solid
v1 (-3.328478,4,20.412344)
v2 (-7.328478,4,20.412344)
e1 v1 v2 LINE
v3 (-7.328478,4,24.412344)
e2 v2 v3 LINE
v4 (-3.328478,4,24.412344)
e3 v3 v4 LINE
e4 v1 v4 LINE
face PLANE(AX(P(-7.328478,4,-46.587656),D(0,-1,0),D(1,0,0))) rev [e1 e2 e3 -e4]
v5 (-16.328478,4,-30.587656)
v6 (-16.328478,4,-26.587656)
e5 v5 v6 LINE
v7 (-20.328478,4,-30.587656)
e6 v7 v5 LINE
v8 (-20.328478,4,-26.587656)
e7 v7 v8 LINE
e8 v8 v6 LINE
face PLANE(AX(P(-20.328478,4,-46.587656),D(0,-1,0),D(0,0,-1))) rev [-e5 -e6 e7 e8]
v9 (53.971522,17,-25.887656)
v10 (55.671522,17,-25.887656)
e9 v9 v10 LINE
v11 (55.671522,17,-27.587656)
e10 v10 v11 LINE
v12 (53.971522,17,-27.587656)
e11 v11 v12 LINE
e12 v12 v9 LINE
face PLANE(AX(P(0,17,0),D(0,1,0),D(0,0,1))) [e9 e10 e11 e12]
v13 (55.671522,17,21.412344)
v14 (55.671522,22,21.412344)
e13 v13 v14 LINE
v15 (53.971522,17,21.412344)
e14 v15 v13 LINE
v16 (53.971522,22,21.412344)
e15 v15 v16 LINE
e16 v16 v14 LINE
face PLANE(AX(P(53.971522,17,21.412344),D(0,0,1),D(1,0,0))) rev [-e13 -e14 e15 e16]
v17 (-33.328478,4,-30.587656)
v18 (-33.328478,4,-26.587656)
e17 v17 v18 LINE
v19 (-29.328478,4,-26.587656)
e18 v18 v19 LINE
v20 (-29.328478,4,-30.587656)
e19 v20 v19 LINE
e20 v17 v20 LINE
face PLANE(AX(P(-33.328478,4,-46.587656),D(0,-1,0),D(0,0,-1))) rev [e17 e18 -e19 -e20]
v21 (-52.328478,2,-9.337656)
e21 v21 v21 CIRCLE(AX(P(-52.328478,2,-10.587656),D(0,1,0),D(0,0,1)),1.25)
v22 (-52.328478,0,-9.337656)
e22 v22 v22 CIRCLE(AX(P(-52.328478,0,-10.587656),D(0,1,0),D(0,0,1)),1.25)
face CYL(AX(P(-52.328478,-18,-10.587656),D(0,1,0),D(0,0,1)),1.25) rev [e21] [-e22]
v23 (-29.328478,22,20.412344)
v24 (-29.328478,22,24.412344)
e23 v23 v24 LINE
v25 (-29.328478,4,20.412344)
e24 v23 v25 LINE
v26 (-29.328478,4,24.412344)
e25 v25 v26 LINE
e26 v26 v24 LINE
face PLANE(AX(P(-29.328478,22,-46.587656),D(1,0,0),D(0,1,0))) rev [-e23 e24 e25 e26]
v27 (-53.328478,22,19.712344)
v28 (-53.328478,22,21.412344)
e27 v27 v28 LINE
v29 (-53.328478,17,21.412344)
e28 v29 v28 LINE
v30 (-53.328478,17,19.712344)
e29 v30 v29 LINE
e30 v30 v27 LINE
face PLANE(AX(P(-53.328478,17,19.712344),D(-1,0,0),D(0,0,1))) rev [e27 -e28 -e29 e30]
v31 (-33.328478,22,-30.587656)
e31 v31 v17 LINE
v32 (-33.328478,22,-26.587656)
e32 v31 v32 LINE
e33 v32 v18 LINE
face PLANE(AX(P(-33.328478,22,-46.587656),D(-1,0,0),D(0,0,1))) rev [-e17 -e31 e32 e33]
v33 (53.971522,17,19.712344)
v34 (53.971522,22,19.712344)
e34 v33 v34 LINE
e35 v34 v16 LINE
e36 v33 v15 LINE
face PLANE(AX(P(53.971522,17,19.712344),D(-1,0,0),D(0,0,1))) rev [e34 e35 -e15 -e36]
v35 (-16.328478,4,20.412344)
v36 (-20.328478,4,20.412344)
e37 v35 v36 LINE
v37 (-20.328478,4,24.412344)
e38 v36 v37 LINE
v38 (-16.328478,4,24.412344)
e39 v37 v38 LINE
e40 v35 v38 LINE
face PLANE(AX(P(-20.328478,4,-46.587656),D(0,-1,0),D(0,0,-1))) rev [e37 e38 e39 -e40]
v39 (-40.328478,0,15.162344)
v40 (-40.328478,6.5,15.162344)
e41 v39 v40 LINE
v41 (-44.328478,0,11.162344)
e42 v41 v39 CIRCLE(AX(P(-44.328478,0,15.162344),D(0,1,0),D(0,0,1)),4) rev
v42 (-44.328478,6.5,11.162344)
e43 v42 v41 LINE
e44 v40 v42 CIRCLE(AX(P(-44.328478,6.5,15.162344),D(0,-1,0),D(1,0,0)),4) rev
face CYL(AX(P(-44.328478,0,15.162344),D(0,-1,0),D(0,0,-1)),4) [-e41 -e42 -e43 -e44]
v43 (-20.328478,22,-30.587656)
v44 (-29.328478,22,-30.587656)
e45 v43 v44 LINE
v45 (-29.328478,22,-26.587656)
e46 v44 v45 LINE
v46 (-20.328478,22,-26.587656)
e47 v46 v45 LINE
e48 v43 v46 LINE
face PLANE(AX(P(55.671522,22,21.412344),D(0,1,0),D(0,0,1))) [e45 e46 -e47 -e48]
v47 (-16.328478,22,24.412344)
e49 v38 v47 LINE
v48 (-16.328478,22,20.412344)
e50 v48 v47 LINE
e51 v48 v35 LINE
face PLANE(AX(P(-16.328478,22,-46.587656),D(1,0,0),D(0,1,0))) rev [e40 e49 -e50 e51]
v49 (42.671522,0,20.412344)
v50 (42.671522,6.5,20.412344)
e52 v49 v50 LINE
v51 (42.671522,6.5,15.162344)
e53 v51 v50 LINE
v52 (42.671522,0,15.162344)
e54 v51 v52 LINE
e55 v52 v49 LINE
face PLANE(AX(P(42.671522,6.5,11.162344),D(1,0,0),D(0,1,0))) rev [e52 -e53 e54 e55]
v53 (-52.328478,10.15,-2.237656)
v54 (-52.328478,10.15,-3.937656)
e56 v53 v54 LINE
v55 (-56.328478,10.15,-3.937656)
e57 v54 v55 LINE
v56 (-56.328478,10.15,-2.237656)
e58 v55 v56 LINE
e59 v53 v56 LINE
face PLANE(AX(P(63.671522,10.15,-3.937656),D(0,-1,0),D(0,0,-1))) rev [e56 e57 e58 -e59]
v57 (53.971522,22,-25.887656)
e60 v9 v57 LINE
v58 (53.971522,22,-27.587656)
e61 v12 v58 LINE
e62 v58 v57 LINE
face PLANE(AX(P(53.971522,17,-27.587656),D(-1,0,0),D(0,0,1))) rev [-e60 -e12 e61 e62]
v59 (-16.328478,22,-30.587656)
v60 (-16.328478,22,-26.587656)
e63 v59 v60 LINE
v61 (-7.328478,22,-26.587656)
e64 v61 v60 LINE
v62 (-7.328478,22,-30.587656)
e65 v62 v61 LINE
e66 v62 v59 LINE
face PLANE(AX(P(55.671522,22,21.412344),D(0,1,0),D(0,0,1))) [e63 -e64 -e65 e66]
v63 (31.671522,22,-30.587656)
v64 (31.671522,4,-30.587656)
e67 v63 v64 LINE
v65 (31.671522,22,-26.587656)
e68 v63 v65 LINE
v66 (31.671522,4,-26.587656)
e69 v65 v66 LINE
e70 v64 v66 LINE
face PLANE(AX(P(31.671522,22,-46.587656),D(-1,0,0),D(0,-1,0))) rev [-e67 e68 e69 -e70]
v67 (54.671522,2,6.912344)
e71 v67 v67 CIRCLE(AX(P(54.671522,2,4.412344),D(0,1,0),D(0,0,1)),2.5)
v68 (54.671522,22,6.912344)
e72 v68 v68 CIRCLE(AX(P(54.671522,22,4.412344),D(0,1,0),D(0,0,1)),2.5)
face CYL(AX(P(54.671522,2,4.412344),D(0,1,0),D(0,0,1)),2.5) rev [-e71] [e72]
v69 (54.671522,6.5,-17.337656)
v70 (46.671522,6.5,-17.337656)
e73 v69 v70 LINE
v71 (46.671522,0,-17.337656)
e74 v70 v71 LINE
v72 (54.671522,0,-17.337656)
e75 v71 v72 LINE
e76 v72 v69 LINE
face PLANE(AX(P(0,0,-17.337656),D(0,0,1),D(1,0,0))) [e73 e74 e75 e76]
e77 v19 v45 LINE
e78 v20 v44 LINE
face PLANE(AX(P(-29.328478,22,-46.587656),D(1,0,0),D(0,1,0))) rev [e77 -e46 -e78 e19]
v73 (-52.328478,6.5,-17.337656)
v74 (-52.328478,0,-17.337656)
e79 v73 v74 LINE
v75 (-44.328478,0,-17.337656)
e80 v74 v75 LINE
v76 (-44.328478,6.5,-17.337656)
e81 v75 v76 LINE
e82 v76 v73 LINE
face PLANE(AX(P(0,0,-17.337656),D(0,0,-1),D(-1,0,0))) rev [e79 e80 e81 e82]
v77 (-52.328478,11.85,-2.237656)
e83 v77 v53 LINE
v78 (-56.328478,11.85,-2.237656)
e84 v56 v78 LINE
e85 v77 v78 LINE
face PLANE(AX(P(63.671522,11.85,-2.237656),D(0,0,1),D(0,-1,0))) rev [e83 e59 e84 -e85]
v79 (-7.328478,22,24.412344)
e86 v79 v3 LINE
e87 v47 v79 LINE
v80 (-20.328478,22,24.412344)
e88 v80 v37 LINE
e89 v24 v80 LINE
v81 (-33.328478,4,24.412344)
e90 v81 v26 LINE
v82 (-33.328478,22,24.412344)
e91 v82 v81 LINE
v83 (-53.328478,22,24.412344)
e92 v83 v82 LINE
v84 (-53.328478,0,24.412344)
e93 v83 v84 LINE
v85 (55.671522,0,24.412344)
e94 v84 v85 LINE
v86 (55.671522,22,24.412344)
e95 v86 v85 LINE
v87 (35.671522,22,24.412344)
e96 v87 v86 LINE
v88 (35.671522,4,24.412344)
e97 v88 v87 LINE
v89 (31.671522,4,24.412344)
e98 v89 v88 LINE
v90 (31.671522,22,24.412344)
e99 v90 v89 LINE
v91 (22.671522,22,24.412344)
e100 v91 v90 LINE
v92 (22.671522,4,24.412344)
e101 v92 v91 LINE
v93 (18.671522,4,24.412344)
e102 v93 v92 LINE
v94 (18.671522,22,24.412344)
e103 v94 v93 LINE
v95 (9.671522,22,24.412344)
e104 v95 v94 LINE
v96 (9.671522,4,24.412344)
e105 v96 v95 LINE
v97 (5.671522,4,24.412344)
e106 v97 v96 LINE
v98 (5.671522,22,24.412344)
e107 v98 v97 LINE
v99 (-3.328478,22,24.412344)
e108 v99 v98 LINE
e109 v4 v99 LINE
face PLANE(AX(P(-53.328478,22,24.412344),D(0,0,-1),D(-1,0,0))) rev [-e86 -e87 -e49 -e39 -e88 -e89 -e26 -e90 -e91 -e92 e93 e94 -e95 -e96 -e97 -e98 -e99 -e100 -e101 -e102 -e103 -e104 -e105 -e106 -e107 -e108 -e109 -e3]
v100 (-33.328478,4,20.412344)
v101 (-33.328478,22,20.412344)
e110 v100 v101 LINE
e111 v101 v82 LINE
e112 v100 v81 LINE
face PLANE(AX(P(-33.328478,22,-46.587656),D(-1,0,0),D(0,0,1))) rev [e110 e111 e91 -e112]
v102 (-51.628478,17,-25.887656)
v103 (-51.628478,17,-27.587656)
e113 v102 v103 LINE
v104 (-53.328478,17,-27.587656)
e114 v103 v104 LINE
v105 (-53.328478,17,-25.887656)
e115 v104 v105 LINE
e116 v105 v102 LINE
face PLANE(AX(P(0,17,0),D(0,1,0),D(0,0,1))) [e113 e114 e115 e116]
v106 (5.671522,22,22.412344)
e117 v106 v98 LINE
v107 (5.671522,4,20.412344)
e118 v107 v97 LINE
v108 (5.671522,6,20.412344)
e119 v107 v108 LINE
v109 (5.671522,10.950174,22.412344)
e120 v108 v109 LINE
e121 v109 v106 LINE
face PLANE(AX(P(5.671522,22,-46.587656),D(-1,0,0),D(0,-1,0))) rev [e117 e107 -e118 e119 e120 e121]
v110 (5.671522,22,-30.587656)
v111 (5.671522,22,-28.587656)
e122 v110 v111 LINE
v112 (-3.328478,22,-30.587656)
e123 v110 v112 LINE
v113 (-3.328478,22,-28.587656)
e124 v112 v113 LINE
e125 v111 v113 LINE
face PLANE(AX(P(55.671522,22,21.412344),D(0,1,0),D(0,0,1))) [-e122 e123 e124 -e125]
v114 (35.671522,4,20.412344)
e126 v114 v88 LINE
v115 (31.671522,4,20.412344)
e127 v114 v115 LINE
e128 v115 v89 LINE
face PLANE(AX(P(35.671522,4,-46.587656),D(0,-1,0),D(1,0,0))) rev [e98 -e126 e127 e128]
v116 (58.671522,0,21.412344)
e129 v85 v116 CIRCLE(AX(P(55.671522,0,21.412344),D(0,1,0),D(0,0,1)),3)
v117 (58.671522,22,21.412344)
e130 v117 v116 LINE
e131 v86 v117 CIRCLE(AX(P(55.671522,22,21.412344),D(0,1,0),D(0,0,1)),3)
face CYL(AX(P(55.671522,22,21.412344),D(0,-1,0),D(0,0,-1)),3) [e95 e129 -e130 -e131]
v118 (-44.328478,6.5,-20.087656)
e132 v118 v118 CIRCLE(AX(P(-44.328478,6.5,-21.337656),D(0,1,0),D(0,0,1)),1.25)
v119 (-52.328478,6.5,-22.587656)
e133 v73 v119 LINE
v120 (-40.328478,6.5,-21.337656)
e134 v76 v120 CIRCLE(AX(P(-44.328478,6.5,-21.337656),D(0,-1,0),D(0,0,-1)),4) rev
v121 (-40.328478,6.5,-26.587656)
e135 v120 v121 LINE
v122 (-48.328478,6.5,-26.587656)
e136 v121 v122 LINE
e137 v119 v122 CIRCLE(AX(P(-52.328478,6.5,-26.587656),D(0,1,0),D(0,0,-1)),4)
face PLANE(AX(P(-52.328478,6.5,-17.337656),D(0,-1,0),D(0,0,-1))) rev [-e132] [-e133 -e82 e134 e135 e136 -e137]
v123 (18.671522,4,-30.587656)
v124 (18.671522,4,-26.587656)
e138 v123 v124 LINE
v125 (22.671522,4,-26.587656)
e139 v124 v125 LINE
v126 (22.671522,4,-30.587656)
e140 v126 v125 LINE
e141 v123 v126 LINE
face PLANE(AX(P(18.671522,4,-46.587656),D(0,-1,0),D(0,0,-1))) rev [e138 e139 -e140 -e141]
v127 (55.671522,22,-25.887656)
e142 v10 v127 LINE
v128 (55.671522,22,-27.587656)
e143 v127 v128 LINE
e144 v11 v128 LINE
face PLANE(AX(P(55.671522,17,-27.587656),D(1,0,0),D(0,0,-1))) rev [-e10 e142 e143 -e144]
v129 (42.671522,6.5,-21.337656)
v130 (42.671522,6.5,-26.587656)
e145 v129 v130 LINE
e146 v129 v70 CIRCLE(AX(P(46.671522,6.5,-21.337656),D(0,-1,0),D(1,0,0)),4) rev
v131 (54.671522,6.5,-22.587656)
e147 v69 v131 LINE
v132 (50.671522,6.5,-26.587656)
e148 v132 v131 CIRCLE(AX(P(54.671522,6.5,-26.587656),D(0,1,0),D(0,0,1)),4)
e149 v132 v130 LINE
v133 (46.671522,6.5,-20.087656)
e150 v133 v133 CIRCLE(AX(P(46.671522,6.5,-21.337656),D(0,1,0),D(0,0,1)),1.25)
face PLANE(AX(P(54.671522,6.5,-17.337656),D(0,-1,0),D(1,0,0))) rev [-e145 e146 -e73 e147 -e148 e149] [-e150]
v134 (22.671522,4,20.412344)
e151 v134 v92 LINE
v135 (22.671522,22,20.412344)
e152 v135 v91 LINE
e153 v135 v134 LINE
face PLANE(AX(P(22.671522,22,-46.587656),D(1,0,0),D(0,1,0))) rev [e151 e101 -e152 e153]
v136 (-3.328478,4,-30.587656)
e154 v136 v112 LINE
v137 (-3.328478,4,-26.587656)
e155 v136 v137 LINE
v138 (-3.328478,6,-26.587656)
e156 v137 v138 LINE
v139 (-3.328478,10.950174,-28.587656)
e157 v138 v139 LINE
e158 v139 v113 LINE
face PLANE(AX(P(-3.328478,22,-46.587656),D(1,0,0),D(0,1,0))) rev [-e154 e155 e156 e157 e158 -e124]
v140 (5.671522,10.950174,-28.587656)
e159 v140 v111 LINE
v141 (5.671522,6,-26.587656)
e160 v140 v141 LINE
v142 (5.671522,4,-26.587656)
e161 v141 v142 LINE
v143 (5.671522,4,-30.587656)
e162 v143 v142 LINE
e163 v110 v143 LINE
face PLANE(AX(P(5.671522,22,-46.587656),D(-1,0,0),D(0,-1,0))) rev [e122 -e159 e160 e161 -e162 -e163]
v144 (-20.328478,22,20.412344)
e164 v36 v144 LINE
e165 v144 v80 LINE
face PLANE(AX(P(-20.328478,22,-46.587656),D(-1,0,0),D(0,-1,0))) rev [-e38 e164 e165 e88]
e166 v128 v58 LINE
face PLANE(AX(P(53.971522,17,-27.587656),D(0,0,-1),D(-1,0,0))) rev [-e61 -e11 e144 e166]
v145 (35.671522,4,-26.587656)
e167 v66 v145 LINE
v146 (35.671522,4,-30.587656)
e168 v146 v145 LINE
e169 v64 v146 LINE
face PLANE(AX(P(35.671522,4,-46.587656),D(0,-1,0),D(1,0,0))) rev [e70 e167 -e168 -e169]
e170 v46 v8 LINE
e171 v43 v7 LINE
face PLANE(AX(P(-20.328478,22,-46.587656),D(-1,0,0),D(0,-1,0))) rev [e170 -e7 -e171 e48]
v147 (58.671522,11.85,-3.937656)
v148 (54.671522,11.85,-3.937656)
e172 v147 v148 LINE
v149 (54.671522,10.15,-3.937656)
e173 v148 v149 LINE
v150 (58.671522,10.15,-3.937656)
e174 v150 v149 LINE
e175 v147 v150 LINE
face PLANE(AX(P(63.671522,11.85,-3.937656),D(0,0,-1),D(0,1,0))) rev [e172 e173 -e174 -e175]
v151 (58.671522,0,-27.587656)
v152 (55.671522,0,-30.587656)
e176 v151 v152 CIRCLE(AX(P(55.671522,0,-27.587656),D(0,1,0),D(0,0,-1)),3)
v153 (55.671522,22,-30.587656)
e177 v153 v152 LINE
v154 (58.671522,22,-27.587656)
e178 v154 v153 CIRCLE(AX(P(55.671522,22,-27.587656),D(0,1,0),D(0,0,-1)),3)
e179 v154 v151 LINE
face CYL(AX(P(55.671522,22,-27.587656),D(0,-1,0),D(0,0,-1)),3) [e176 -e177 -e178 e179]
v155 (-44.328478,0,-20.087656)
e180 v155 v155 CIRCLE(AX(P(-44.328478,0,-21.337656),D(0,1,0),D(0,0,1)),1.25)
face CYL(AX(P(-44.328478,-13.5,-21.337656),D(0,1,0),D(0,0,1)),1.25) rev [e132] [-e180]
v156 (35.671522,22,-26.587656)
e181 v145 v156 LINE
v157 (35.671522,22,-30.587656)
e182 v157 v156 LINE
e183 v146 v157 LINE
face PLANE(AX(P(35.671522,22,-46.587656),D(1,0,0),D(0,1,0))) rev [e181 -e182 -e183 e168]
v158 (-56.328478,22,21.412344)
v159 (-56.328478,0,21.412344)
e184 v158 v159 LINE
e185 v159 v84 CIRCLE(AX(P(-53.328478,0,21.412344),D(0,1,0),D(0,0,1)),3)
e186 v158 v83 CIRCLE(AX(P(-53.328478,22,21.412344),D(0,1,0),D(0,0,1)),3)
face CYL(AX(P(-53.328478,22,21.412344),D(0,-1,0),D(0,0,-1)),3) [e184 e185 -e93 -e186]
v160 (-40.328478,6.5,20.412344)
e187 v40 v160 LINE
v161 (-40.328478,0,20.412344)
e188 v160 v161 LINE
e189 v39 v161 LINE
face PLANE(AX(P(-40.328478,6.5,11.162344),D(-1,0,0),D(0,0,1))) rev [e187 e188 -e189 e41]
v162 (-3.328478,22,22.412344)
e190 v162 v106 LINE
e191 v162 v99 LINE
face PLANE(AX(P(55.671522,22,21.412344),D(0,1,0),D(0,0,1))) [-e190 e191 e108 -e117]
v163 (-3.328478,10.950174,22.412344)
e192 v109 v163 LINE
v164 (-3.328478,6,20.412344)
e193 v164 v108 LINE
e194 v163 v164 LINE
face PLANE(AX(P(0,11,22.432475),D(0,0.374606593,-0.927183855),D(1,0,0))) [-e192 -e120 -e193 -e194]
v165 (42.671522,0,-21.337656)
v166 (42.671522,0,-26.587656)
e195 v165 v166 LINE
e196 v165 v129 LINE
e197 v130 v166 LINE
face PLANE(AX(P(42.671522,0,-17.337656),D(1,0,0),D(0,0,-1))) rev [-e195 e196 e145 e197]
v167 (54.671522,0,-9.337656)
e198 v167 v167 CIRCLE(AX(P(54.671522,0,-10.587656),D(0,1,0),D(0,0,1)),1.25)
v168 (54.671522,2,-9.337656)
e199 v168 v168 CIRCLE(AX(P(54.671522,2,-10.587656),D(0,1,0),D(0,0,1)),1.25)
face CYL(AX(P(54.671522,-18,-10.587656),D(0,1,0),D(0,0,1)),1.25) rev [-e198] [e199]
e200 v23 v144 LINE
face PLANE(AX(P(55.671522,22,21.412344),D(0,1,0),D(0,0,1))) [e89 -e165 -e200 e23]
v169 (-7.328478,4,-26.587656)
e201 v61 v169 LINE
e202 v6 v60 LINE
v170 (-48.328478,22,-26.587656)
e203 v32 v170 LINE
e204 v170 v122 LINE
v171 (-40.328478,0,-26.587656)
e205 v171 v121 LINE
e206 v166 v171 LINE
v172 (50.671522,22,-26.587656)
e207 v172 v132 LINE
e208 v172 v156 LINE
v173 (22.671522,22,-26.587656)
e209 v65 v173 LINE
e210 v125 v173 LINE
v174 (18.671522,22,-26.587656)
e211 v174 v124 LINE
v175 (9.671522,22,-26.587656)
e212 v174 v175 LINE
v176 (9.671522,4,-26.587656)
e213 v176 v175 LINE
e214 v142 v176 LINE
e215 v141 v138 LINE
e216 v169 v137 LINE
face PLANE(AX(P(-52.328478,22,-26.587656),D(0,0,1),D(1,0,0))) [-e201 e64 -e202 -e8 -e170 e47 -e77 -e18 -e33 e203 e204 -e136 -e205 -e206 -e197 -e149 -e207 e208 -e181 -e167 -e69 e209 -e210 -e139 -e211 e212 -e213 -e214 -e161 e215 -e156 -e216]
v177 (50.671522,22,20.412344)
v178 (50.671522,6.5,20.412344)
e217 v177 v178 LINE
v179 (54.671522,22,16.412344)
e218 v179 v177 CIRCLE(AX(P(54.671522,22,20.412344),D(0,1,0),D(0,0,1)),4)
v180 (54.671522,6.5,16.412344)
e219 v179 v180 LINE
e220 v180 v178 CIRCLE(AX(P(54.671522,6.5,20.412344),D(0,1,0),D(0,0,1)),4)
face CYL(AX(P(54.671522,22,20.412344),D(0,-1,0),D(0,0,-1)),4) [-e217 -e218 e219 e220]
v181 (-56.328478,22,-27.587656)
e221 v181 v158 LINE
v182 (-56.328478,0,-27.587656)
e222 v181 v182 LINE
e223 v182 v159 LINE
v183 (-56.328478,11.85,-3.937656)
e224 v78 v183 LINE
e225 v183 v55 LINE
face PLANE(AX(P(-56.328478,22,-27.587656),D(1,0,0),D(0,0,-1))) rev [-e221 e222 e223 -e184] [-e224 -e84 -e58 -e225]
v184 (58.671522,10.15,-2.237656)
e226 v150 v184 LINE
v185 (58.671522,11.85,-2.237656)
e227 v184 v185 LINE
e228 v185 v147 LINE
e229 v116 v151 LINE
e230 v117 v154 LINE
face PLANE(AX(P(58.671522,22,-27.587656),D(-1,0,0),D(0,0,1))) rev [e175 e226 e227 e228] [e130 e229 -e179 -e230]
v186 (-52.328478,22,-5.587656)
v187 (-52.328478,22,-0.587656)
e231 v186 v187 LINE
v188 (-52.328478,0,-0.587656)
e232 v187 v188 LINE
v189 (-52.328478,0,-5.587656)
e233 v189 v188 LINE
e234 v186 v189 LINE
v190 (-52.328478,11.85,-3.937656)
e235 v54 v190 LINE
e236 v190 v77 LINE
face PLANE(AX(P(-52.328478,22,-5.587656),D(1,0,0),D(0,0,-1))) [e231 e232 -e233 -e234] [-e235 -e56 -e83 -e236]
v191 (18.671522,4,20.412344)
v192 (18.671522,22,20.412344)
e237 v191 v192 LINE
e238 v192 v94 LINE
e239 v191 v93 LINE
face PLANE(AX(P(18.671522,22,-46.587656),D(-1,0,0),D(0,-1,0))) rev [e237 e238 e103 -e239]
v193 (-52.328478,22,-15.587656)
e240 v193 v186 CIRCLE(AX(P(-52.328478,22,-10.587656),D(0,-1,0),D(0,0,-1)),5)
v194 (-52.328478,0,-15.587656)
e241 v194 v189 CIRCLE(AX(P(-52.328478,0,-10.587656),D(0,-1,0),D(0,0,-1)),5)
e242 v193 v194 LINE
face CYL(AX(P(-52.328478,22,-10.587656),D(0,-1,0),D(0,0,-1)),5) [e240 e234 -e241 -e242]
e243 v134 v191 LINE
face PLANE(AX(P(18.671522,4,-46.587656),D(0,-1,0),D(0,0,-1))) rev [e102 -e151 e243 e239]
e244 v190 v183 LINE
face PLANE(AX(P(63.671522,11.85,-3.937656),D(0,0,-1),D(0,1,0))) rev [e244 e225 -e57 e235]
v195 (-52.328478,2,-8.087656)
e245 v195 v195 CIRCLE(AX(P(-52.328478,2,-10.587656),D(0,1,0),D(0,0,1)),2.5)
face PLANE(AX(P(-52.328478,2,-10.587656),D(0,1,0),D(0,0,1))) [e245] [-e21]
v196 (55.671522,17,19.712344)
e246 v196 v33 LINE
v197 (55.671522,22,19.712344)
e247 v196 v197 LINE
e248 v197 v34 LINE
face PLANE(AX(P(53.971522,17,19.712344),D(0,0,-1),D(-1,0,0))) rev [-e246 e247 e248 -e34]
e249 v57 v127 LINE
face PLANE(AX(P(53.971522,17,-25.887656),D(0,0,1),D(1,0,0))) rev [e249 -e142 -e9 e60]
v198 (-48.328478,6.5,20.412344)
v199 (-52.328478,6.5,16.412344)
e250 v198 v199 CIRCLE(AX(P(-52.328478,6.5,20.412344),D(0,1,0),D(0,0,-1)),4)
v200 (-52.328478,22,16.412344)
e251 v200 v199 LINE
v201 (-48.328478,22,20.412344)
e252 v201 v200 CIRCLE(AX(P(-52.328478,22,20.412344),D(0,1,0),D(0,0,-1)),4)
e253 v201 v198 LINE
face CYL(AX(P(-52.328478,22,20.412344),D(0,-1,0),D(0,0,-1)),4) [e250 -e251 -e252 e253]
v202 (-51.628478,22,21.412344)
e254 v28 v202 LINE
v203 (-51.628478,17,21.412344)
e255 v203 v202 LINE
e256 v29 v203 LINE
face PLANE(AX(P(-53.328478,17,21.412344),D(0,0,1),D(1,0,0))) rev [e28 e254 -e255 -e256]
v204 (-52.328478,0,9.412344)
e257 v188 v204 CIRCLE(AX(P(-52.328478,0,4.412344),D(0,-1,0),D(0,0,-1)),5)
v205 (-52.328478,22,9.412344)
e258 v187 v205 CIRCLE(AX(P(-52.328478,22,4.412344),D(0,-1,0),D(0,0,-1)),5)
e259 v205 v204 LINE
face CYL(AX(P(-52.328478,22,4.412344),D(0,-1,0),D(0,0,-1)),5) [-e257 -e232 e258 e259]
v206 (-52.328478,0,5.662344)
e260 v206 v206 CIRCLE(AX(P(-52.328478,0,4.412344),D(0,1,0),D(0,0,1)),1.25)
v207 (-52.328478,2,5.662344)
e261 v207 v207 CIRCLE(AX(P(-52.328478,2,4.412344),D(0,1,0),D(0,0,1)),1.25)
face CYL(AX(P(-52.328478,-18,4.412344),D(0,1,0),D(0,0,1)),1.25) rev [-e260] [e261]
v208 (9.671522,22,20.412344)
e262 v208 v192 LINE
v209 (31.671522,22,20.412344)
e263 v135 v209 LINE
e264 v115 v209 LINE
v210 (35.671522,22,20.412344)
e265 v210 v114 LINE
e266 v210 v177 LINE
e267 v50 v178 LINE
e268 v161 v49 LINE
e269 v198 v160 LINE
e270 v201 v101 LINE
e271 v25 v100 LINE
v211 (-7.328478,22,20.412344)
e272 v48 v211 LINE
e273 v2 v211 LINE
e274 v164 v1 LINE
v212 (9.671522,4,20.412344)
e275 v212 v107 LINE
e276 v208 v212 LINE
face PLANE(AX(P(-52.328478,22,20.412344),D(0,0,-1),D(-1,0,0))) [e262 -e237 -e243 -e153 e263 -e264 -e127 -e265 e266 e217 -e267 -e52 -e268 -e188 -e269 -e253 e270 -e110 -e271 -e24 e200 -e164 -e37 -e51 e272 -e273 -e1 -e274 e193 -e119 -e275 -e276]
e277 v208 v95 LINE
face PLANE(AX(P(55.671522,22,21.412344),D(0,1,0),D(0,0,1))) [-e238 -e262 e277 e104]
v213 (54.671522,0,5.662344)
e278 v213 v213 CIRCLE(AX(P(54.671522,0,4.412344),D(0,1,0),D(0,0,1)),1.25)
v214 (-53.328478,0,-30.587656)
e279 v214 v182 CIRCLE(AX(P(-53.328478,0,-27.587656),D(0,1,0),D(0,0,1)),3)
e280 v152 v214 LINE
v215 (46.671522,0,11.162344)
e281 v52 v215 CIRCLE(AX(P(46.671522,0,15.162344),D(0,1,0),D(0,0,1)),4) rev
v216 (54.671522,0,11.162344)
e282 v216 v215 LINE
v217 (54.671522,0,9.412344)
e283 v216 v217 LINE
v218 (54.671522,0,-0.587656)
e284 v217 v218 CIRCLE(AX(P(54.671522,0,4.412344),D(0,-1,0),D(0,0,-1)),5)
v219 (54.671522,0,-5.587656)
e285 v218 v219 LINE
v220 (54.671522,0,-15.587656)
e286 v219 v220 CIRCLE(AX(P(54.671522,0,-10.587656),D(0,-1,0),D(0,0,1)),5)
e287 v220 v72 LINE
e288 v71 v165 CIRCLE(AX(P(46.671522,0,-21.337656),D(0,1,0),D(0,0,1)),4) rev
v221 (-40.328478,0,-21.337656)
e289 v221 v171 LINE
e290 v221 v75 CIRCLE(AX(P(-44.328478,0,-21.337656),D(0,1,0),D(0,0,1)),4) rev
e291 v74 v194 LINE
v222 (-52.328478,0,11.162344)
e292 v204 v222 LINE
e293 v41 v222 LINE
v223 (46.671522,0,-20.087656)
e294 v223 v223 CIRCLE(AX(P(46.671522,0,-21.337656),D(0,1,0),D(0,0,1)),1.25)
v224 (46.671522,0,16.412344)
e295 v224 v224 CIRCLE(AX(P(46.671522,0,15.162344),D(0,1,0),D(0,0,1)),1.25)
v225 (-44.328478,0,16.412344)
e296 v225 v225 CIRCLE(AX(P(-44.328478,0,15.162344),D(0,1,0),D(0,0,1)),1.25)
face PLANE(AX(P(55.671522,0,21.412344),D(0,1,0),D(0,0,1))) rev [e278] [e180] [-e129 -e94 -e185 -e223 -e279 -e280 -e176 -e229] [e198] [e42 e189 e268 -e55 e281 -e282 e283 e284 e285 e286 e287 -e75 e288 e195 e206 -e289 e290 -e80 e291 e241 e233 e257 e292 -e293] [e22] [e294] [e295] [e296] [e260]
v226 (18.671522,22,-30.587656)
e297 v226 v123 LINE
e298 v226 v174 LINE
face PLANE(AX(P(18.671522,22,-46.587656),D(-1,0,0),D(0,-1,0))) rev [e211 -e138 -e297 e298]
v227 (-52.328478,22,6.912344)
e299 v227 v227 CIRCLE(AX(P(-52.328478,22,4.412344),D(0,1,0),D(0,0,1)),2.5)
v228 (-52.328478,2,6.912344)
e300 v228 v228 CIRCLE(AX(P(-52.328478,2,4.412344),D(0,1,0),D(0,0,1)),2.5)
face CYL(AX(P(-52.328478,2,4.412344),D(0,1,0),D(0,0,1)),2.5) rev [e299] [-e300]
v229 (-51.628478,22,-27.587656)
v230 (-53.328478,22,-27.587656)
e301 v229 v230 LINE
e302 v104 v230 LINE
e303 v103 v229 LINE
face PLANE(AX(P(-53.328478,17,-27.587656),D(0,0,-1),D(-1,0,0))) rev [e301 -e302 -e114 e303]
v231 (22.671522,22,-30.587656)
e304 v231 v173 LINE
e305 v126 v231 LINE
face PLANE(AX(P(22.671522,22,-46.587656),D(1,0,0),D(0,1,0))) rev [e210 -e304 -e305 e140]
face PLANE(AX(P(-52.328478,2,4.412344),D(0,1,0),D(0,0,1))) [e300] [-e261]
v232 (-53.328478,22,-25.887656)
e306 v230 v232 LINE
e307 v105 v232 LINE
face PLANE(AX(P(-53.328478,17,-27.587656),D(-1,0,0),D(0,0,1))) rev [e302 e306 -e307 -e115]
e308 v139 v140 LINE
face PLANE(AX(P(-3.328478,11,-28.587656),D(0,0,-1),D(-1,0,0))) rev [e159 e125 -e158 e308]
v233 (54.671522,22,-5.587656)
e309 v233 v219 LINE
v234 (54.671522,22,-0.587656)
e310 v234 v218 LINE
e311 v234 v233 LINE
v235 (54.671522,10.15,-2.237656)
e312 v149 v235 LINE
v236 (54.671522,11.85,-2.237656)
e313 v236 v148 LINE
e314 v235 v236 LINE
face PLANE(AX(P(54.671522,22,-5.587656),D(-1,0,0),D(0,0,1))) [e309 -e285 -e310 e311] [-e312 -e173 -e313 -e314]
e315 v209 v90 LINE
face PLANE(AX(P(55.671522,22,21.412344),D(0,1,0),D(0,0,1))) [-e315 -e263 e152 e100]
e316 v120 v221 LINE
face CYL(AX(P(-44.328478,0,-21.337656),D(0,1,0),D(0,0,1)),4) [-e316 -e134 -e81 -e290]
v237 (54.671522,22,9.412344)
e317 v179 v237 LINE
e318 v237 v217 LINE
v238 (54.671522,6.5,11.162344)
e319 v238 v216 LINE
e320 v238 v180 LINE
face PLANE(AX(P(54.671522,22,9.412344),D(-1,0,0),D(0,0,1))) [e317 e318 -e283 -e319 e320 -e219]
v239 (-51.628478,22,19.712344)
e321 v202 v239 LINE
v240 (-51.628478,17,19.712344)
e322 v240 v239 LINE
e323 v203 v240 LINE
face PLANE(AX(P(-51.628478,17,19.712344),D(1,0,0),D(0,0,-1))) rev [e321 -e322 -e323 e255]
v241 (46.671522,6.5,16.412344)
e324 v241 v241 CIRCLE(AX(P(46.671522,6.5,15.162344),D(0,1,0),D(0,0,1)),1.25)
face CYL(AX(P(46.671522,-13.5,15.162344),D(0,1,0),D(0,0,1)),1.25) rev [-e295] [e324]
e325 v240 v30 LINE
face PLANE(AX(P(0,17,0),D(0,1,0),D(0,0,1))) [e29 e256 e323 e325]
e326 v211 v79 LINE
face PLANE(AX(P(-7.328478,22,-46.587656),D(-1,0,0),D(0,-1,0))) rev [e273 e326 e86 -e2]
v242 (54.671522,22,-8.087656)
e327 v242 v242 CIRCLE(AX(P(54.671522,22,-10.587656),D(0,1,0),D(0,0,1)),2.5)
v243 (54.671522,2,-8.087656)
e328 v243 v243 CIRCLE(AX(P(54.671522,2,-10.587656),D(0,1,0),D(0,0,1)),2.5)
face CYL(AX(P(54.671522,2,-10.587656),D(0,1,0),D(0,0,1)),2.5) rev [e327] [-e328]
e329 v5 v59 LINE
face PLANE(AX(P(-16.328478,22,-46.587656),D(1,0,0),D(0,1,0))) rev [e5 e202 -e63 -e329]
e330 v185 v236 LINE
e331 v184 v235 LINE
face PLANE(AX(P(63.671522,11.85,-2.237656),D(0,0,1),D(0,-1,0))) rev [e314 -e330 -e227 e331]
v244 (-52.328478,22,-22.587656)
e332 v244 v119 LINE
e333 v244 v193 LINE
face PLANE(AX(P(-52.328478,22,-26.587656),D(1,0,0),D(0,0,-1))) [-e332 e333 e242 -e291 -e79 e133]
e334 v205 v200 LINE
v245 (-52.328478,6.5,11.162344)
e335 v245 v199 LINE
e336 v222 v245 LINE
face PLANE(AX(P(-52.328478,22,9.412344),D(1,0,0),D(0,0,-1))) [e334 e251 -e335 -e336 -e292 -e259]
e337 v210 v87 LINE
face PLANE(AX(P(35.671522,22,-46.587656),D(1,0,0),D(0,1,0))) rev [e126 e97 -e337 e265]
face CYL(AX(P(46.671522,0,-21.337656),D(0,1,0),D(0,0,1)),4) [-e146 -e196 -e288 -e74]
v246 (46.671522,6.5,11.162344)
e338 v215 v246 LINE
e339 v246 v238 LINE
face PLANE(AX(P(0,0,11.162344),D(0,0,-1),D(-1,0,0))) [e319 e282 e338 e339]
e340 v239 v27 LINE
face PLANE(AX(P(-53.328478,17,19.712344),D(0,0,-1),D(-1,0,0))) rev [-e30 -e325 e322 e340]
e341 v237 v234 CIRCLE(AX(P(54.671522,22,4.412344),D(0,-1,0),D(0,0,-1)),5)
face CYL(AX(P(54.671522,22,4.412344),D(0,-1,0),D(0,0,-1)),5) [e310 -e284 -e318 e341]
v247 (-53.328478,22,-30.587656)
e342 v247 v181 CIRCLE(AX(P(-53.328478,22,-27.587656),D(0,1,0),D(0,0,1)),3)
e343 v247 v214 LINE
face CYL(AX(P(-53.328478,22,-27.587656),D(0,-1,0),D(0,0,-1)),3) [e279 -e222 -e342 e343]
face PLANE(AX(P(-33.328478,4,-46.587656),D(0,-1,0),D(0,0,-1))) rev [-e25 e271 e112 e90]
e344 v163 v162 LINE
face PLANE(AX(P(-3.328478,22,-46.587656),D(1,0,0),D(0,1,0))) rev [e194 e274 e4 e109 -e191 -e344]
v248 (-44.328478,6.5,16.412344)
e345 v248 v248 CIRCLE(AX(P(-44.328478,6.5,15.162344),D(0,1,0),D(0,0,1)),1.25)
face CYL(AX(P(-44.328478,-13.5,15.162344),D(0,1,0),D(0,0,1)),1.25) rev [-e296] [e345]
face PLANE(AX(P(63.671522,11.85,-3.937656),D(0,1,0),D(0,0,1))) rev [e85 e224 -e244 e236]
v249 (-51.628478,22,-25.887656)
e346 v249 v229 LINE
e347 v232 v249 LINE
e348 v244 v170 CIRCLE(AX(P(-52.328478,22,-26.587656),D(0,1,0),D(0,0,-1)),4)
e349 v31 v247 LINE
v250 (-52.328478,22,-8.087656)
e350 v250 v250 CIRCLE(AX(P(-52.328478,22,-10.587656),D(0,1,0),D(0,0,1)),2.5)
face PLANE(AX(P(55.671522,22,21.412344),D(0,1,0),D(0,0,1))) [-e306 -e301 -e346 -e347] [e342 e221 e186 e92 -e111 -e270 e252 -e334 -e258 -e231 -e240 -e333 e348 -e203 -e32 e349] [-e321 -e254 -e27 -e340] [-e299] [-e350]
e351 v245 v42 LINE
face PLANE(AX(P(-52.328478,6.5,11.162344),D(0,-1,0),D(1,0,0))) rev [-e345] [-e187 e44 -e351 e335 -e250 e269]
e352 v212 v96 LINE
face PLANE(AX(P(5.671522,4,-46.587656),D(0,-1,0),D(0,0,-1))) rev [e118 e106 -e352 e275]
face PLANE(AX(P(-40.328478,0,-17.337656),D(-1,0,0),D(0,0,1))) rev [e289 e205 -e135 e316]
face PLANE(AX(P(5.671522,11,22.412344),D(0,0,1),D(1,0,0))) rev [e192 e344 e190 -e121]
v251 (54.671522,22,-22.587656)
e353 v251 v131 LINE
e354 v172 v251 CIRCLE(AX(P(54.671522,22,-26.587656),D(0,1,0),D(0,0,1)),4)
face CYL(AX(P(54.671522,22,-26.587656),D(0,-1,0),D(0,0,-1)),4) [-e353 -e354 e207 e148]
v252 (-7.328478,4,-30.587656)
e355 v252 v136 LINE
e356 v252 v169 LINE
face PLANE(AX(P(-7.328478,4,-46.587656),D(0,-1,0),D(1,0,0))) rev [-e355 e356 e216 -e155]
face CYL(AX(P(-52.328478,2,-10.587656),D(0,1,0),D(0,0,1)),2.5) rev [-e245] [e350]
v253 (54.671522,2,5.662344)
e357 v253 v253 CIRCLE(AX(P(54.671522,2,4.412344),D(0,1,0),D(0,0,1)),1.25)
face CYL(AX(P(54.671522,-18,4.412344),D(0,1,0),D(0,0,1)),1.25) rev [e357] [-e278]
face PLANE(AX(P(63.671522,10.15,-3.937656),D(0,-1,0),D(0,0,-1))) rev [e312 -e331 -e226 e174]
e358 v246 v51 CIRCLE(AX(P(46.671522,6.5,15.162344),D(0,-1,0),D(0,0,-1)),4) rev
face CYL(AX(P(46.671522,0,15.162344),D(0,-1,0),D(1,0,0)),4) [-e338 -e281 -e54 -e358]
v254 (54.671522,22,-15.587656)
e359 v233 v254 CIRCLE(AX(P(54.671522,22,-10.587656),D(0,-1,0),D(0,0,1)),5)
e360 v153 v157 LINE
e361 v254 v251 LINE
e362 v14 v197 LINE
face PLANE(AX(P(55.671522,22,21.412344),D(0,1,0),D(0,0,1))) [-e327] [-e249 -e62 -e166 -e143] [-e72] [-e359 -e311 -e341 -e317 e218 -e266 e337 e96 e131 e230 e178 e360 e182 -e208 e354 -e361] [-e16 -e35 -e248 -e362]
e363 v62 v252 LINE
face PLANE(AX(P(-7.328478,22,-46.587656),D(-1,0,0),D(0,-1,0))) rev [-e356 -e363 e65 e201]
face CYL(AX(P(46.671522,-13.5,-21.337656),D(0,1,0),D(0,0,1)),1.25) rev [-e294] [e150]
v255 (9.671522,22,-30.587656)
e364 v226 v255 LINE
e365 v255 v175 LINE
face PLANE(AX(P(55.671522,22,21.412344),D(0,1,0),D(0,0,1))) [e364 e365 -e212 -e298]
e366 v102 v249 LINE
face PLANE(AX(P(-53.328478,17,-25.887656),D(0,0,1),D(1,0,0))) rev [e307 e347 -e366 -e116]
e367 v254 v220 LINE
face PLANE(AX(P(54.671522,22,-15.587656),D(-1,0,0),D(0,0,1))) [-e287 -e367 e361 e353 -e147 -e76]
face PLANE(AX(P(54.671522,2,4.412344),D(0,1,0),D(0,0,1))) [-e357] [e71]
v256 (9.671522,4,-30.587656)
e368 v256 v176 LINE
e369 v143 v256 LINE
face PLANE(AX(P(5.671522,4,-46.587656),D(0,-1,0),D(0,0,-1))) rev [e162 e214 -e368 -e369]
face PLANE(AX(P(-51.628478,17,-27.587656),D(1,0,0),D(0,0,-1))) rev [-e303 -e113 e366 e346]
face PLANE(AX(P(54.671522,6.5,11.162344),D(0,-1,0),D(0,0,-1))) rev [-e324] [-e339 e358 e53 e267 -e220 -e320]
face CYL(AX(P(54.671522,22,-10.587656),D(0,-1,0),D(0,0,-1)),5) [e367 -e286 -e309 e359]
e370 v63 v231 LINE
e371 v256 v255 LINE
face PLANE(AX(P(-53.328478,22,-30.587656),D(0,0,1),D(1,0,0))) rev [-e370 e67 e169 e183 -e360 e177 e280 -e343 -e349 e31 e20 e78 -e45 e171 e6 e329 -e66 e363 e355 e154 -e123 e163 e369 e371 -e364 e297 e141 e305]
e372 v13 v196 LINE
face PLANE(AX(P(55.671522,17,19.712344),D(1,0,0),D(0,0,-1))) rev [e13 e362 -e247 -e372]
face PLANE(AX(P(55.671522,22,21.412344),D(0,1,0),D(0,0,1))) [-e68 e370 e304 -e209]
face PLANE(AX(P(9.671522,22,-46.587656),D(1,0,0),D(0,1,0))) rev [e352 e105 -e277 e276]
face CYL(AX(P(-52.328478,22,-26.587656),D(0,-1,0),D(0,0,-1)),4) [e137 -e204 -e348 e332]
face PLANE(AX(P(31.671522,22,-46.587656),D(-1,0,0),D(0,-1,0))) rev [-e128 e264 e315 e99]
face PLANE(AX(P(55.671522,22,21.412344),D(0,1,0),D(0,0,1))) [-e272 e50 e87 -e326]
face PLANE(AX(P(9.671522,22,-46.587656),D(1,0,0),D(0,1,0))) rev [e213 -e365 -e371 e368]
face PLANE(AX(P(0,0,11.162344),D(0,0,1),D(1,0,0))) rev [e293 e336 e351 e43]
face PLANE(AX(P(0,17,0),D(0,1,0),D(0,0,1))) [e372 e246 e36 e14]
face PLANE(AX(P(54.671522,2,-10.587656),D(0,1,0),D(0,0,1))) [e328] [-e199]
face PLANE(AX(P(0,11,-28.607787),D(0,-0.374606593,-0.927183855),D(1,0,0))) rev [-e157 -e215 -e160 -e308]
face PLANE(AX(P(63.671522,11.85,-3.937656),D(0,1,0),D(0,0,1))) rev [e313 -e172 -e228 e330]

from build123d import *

# Parameters (mm, degrees)
EXTRUDE_1_DEPTH     = 22
SKETCH_4_W          = 12
SKETCH_4_H          = 6.5
EXTRUDE_3_DEPTH     = 9.25
FILLET_1_R          = 4
SKETCH_5_W          = 12
SKETCH_5_H          = 6.5
EXTRUDE_4_DEPTH     = 9.25
FILLET_2_R          = 4
SKETCH_6_R          = 2.5
CUT_EXTRUDE_1_DEPTH = 20
SKETCH_7_R          = 1.25
CUT_EXTRUDE_2_DEPTH = 20
SKETCH_8_R          = 1.25
CUT_EXTRUDE_3_DEPTH = 20
SKETCH_9_W          = 1.7
SKETCH_9_H          = 1.7
CUT_EXTRUDE_4_DEPTH = 120
EXTRUDE_5_DEPTH     = 15.5
SKETCH_11_W         = 1.7
SKETCH_11_H         = 1.7
CUT_EXTRUDE_5_DEPTH = 5
SKETCH_12_W         = 4
SKETCH_12_H         = 18
CUT_EXTRUDE_6_DEPTH = 71
SKETCH_13_W         = 9
SKETCH_13_H         = 2
CUT_EXTRUDE_7_DEPTH = 11
CHAMFER_1_SIZE      = 5
CHAMFER_1_SIZE_2    = 2.020131129


with BuildPart() as part:
    # Эскиз1 → Бобышка-Вытянуть1 (new body)
    with BuildSketch(Plane(origin=(0, 0, 0), x_dir=(1, 0, 0), z_dir=(0, 1, 0))):
        with BuildLine():
            Line((-53.32847827, 30.587656235), (55.67152173, 30.587656235))
            ThreePointArc((55.67152173, 30.587656235), (57.792842073, 29.708976578), (58.67152173, 27.587656235))
            Line((58.67152173, 27.587656235), (58.67152173, -21.412343765))
            ThreePointArc((58.67152173, -21.412343765), (57.792842073, -23.533664109), (55.67152173, -24.412343765))
            Line((55.67152173, -24.412343765), (-53.32847827, -24.412343765))
            ThreePointArc((-53.32847827, -24.412343765), (-55.449798614, -23.533664109), (-56.32847827, -21.412343765))
            Line((-56.32847827, -21.412343765), (-56.32847827, 27.587656235))
            ThreePointArc((-56.32847827, 27.587656235), (-55.449798614, 29.708976578), (-53.32847827, 30.587656235))
        make_face()
        with BuildLine():
            Line((-52.32847827, 26.587656235), (-52.32847827, 15.587656235))
            ThreePointArc((-52.32847827, 15.587656235), (-47.32847827, 10.587656235), (-52.32847827, 5.587656235))
            Line((-52.32847827, 5.587656235), (-52.32847827, 0.587656235))
            ThreePointArc((-52.32847827, 0.587656235), (-47.32847827, -4.412343765), (-52.32847827, -9.412343765))
            Line((-52.32847827, -9.412343765), (-52.32847827, -20.412343765))
            Line((-52.32847827, -20.412343765), (54.67152173, -20.412343765))
            Line((54.67152173, -20.412343765), (54.67152173, -9.412343765))
            ThreePointArc((54.67152173, -9.412343765), (49.67152173, -4.412343765), (54.67152173, 0.587656235))
            Line((54.67152173, 0.587656235), (54.67152173, 5.587656235))
            ThreePointArc((54.67152173, 5.587656235), (49.67152173, 10.587656235), (54.67152173, 15.587656235))
            Line((54.67152173, 15.587656235), (54.67152173, 26.587656235))
            Line((54.67152173, 26.587656235), (-52.32847827, 26.587656235))
        make_face(mode=Mode.SUBTRACT)
    extrude(amount=EXTRUDE_1_DEPTH)

    # Эскиз4 → Бобышка-Вытянуть3 (add)
    with BuildSketch(Plane(origin=(0, 0, 20.412343765), x_dir=(-1, 0, 0), z_dir=(0, 0, -1))):
        with Locations((46.32847827, 3.25)):
            Rectangle(SKETCH_4_W, SKETCH_4_H)
        with Locations((-48.67152173, 3.25)):
            Rectangle(SKETCH_4_W, SKETCH_4_H)
    extrude(amount=EXTRUDE_3_DEPTH)

    # Скругление1
    fillet_1_edges = [part.edges().sort_by_distance(p)[0] for p in [
        (-40.32847827, 3.25, 11.162343765),
        (42.67152173, 3.25, 11.162343765),
    ]]
    fillet(fillet_1_edges, radius=FILLET_1_R)

    # Эскиз5 → Бобышка-Вытянуть4 (add)
    with BuildSketch(Plane.XY.offset(-26.587656235)):
        with Locations((-46.32847827, 3.25)):
            Rectangle(SKETCH_5_W, SKETCH_5_H)
        with Locations((48.67152173, 3.25)):
            Rectangle(SKETCH_5_W, SKETCH_5_H)
    extrude(amount=EXTRUDE_4_DEPTH)

    # Скругление2
    fillet_2_edges = [part.edges().sort_by_distance(p)[0] for p in [
        (-40.32847827, 3.25, -17.337656235),
        (42.67152173, 3.25, -17.337656235),
    ]]
    fillet(fillet_2_edges, radius=FILLET_2_R)

    # Эскиз6 → Вырез-Вытянуть1 (cut)
    with BuildSketch(Plane(origin=(0, 22, 0), x_dir=(1, 0, 0), z_dir=(0, 1, 0))):
        with Locations(Location((-52.32847827, 10.587656235, 0), (0, 0, 270))):
            Circle(SKETCH_6_R)
        with Locations(Location((-52.32847827, -4.412343765, 0), (0, 0, 270))):
            Circle(SKETCH_6_R)
        with Locations(Location((54.67152173, 10.587656235, 0), (0, 0, 270))):
            Circle(SKETCH_6_R)
        with Locations(Location((54.67152173, -4.412343765, 0), (0, 0, 270))):
            Circle(SKETCH_6_R)
    extrude(amount=-CUT_EXTRUDE_1_DEPTH, mode=Mode.SUBTRACT)

    # Эскиз7 → Вырез-Вытянуть2 (cut)
    with BuildSketch(Plane(origin=(0, 6.5, 0), x_dir=(1, 0, 0), z_dir=(0, 1, 0))):
        with Locations(Location((-44.32847827, 21.337656235, 0), (0, 0, 270))):
            Circle(SKETCH_7_R)
        with Locations(Location((46.67152173, 21.337656235, 0), (0, 0, 270))):
            Circle(SKETCH_7_R)
        with Locations(Location((46.67152173, -15.162343765, 0), (0, 0, 270))):
            Circle(SKETCH_7_R)
        with Locations(Location((-44.32847827, -15.162343765, 0), (0, 0, 270))):
            Circle(SKETCH_7_R)
    extrude(amount=-CUT_EXTRUDE_2_DEPTH, mode=Mode.SUBTRACT)

    # Эскиз8 → Вырез-Вытянуть3 (cut)
    with BuildSketch(Plane(origin=(0, 2, 0), x_dir=(1, 0, 0), z_dir=(0, 1, 0))):
        with Locations(Location((-52.32847827, 10.587656235, 0), (0, 0, 270))):
            Circle(SKETCH_8_R)
        with Locations(Location((-52.32847827, -4.412343765, 0), (0, 0, 270))):
            Circle(SKETCH_8_R)
        with Locations(Location((54.67152173, 10.587656235, 0), (0, 0, 270))):
            Circle(SKETCH_8_R)
        with Locations(Location((54.67152173, -4.412343765, 0), (0, 0, 270))):
            Circle(SKETCH_8_R)
    extrude(amount=-CUT_EXTRUDE_3_DEPTH, mode=Mode.SUBTRACT)

    # Эскиз9 → Вырез-Вытянуть4 (cut)
    with BuildSketch(Plane.ZY.offset(56.32847827)):
        with Locations((-3.087656235, 11)):
            Rectangle(SKETCH_9_W, SKETCH_9_H)
    extrude(amount=-CUT_EXTRUDE_4_DEPTH, mode=Mode.SUBTRACT)

    # Эскиз10 → Бобышка-Вытянуть5 (add)
    with BuildSketch(Plane(origin=(0, 6.5, 0), x_dir=(1, 0, 0), z_dir=(0, 1, 0))):
        with BuildLine():
            Line((-52.32847827, 22.587656235), (-52.32847827, 26.587656235))
            Line((-52.32847827, 26.587656235), (-48.32847827, 26.587656235))
            ThreePointArc((-48.32847827, 26.587656235), (-49.500051146, 23.75922911), (-52.32847827, 22.587656235))
        make_face()
        with BuildLine():
            Line((-52.32847827, -16.412343765), (-52.32847827, -20.412343765))
            Line((-52.32847827, -20.412343765), (-48.32847827, -20.412343765))
            ThreePointArc((-48.32847827, -20.412343765), (-49.500051146, -17.58391664), (-52.32847827, -16.412343765))
        make_face()
        with BuildLine():
            Line((54.67152173, -16.412343765), (54.67152173, -20.412343765))
            Line((54.67152173, -20.412343765), (50.67152173, -20.412343765))
            ThreePointArc((50.67152173, -20.412343765), (51.843094605, -17.58391664), (54.67152173, -16.412343765))
        make_face()
        with BuildLine():
            Line((54.67152173, 22.587656235), (54.67152173, 26.587656235))
            Line((54.67152173, 26.587656235), (50.67152173, 26.587656235))
            ThreePointArc((50.67152173, 26.587656235), (51.843094605, 23.75922911), (54.67152173, 22.587656235))
        make_face()
    extrude(amount=EXTRUDE_5_DEPTH)

    # Эскиз11 → Вырез-Вытянуть5 (cut)
    with BuildSketch(Plane(origin=(0, 22, 0), x_dir=(1, 0, 0), z_dir=(0, 1, 0))):
        with Locations((-52.47847827, 26.737656235)):
            Rectangle(SKETCH_11_W, SKETCH_11_H)
        with Locations((54.82152173, 26.737656235)):
            Rectangle(SKETCH_11_W, SKETCH_11_H)
        with Locations((54.82152173, -20.562343765)):
            Rectangle(SKETCH_11_W, SKETCH_11_H)
        with Locations((-52.47847827, -20.562343765)):
            Rectangle(SKETCH_11_W, SKETCH_11_H)
    extrude(amount=-CUT_EXTRUDE_5_DEPTH, mode=Mode.SUBTRACT)

    # Эскиз12 → Вырез-Вытянуть6 (cut)
    with BuildSketch(Plane.XY.offset(24.412343765)):
        with Locations((-31.32847827, 13)):
            Rectangle(SKETCH_12_W, SKETCH_12_H)
        with Locations((-18.32847827, 13)):
            Rectangle(SKETCH_12_W, SKETCH_12_H)
        with Locations((-5.32847827, 13)):
            Rectangle(SKETCH_12_W, SKETCH_12_H)
        with Locations((7.67152173, 13)):
            Rectangle(SKETCH_12_W, SKETCH_12_H)
        with Locations((20.67152173, 13)):
            Rectangle(SKETCH_12_W, SKETCH_12_H)
        with Locations((33.67152173, 13)):
            Rectangle(SKETCH_12_W, SKETCH_12_H)
    extrude(amount=-CUT_EXTRUDE_6_DEPTH, mode=Mode.SUBTRACT)

    # Эскиз13 → Вырез-Вытянуть7 (cut)
    with BuildSketch(Plane(origin=(0, 22, 0), x_dir=(1, 0, 0), z_dir=(0, 1, 0))):
        with Locations((1.17152173, 27.587656235)):
            Rectangle(SKETCH_13_W, SKETCH_13_H)
        with Locations((1.17152173, -21.412343765)):
            Rectangle(SKETCH_13_W, SKETCH_13_H)
    extrude(amount=-CUT_EXTRUDE_7_DEPTH, mode=Mode.SUBTRACT)

    # Фаска1
    # the kernel refuses this chamfer: 5, 2.020131129 mm, written as the material it takes off along each edge
    with BuildSketch(Plane(origin=(5.67152173, 11, -26.587656235), x_dir=(0, -0.9998956380575358, 0.01444690255776391), z_dir=(-1, 0, 0))) as chamfer_1_piece_1_section:
        Polygon((CHAMFER_1_SIZE * 0.999895638058, -CHAMFER_1_SIZE * 0.0144469025578), (-CHAMFER_1_SIZE_2 * 0.014446902559, -CHAMFER_1_SIZE_2 * 0.999895638145), (0, 0), align=None)
    chamfer_1_piece_1 = extrude(amount=21.964944974, mode=Mode.PRIVATE)
    chamfer_1_piece_1 = split(chamfer_1_piece_1, bisect_by=Plane(origin=(-7.32847827, 9.333169456, -27.260900856), z_dir=(1, 0, 0)), keep=Keep.TOP, mode=Mode.PRIVATE)
    chamfer_1_piece_1 = split(chamfer_1_piece_1, bisect_by=Plane(origin=(1.17152173, 9.333169456, -28.587656235), z_dir=(0, 0, 1)), keep=Keep.TOP, mode=Mode.PRIVATE)
    add(chamfer_1_piece_1, mode=Mode.SUBTRACT)
    with BuildSketch(Plane(origin=(18.636466704, 11, 20.412343765), x_dir=(0, -0.9998956380575358, -0.01444690255776391), z_dir=(-1, 0, 0))) as chamfer_1_piece_2_section:
        Polygon((CHAMFER_1_SIZE * 0.999895638058, CHAMFER_1_SIZE * 0.0144469025578), (-CHAMFER_1_SIZE_2 * 0.014446902559, CHAMFER_1_SIZE_2 * 0.999895638145), (0, 0), align=None)
    chamfer_1_piece_2 = extrude(amount=21.964944974, mode=Mode.PRIVATE)
    chamfer_1_piece_2 = split(chamfer_1_piece_2, bisect_by=Plane(origin=(9.67152173, 9.333169456, 21.085588387), z_dir=(-1, 0, 0)), keep=Keep.TOP, mode=Mode.PRIVATE)
    chamfer_1_piece_2 = split(chamfer_1_piece_2, bisect_by=Plane(origin=(1.17152173, 9.333169456, 22.412343765), z_dir=(0, 0, -1)), keep=Keep.TOP, mode=Mode.PRIVATE)
    add(chamfer_1_piece_2, mode=Mode.SUBTRACT)


solid = part.part
